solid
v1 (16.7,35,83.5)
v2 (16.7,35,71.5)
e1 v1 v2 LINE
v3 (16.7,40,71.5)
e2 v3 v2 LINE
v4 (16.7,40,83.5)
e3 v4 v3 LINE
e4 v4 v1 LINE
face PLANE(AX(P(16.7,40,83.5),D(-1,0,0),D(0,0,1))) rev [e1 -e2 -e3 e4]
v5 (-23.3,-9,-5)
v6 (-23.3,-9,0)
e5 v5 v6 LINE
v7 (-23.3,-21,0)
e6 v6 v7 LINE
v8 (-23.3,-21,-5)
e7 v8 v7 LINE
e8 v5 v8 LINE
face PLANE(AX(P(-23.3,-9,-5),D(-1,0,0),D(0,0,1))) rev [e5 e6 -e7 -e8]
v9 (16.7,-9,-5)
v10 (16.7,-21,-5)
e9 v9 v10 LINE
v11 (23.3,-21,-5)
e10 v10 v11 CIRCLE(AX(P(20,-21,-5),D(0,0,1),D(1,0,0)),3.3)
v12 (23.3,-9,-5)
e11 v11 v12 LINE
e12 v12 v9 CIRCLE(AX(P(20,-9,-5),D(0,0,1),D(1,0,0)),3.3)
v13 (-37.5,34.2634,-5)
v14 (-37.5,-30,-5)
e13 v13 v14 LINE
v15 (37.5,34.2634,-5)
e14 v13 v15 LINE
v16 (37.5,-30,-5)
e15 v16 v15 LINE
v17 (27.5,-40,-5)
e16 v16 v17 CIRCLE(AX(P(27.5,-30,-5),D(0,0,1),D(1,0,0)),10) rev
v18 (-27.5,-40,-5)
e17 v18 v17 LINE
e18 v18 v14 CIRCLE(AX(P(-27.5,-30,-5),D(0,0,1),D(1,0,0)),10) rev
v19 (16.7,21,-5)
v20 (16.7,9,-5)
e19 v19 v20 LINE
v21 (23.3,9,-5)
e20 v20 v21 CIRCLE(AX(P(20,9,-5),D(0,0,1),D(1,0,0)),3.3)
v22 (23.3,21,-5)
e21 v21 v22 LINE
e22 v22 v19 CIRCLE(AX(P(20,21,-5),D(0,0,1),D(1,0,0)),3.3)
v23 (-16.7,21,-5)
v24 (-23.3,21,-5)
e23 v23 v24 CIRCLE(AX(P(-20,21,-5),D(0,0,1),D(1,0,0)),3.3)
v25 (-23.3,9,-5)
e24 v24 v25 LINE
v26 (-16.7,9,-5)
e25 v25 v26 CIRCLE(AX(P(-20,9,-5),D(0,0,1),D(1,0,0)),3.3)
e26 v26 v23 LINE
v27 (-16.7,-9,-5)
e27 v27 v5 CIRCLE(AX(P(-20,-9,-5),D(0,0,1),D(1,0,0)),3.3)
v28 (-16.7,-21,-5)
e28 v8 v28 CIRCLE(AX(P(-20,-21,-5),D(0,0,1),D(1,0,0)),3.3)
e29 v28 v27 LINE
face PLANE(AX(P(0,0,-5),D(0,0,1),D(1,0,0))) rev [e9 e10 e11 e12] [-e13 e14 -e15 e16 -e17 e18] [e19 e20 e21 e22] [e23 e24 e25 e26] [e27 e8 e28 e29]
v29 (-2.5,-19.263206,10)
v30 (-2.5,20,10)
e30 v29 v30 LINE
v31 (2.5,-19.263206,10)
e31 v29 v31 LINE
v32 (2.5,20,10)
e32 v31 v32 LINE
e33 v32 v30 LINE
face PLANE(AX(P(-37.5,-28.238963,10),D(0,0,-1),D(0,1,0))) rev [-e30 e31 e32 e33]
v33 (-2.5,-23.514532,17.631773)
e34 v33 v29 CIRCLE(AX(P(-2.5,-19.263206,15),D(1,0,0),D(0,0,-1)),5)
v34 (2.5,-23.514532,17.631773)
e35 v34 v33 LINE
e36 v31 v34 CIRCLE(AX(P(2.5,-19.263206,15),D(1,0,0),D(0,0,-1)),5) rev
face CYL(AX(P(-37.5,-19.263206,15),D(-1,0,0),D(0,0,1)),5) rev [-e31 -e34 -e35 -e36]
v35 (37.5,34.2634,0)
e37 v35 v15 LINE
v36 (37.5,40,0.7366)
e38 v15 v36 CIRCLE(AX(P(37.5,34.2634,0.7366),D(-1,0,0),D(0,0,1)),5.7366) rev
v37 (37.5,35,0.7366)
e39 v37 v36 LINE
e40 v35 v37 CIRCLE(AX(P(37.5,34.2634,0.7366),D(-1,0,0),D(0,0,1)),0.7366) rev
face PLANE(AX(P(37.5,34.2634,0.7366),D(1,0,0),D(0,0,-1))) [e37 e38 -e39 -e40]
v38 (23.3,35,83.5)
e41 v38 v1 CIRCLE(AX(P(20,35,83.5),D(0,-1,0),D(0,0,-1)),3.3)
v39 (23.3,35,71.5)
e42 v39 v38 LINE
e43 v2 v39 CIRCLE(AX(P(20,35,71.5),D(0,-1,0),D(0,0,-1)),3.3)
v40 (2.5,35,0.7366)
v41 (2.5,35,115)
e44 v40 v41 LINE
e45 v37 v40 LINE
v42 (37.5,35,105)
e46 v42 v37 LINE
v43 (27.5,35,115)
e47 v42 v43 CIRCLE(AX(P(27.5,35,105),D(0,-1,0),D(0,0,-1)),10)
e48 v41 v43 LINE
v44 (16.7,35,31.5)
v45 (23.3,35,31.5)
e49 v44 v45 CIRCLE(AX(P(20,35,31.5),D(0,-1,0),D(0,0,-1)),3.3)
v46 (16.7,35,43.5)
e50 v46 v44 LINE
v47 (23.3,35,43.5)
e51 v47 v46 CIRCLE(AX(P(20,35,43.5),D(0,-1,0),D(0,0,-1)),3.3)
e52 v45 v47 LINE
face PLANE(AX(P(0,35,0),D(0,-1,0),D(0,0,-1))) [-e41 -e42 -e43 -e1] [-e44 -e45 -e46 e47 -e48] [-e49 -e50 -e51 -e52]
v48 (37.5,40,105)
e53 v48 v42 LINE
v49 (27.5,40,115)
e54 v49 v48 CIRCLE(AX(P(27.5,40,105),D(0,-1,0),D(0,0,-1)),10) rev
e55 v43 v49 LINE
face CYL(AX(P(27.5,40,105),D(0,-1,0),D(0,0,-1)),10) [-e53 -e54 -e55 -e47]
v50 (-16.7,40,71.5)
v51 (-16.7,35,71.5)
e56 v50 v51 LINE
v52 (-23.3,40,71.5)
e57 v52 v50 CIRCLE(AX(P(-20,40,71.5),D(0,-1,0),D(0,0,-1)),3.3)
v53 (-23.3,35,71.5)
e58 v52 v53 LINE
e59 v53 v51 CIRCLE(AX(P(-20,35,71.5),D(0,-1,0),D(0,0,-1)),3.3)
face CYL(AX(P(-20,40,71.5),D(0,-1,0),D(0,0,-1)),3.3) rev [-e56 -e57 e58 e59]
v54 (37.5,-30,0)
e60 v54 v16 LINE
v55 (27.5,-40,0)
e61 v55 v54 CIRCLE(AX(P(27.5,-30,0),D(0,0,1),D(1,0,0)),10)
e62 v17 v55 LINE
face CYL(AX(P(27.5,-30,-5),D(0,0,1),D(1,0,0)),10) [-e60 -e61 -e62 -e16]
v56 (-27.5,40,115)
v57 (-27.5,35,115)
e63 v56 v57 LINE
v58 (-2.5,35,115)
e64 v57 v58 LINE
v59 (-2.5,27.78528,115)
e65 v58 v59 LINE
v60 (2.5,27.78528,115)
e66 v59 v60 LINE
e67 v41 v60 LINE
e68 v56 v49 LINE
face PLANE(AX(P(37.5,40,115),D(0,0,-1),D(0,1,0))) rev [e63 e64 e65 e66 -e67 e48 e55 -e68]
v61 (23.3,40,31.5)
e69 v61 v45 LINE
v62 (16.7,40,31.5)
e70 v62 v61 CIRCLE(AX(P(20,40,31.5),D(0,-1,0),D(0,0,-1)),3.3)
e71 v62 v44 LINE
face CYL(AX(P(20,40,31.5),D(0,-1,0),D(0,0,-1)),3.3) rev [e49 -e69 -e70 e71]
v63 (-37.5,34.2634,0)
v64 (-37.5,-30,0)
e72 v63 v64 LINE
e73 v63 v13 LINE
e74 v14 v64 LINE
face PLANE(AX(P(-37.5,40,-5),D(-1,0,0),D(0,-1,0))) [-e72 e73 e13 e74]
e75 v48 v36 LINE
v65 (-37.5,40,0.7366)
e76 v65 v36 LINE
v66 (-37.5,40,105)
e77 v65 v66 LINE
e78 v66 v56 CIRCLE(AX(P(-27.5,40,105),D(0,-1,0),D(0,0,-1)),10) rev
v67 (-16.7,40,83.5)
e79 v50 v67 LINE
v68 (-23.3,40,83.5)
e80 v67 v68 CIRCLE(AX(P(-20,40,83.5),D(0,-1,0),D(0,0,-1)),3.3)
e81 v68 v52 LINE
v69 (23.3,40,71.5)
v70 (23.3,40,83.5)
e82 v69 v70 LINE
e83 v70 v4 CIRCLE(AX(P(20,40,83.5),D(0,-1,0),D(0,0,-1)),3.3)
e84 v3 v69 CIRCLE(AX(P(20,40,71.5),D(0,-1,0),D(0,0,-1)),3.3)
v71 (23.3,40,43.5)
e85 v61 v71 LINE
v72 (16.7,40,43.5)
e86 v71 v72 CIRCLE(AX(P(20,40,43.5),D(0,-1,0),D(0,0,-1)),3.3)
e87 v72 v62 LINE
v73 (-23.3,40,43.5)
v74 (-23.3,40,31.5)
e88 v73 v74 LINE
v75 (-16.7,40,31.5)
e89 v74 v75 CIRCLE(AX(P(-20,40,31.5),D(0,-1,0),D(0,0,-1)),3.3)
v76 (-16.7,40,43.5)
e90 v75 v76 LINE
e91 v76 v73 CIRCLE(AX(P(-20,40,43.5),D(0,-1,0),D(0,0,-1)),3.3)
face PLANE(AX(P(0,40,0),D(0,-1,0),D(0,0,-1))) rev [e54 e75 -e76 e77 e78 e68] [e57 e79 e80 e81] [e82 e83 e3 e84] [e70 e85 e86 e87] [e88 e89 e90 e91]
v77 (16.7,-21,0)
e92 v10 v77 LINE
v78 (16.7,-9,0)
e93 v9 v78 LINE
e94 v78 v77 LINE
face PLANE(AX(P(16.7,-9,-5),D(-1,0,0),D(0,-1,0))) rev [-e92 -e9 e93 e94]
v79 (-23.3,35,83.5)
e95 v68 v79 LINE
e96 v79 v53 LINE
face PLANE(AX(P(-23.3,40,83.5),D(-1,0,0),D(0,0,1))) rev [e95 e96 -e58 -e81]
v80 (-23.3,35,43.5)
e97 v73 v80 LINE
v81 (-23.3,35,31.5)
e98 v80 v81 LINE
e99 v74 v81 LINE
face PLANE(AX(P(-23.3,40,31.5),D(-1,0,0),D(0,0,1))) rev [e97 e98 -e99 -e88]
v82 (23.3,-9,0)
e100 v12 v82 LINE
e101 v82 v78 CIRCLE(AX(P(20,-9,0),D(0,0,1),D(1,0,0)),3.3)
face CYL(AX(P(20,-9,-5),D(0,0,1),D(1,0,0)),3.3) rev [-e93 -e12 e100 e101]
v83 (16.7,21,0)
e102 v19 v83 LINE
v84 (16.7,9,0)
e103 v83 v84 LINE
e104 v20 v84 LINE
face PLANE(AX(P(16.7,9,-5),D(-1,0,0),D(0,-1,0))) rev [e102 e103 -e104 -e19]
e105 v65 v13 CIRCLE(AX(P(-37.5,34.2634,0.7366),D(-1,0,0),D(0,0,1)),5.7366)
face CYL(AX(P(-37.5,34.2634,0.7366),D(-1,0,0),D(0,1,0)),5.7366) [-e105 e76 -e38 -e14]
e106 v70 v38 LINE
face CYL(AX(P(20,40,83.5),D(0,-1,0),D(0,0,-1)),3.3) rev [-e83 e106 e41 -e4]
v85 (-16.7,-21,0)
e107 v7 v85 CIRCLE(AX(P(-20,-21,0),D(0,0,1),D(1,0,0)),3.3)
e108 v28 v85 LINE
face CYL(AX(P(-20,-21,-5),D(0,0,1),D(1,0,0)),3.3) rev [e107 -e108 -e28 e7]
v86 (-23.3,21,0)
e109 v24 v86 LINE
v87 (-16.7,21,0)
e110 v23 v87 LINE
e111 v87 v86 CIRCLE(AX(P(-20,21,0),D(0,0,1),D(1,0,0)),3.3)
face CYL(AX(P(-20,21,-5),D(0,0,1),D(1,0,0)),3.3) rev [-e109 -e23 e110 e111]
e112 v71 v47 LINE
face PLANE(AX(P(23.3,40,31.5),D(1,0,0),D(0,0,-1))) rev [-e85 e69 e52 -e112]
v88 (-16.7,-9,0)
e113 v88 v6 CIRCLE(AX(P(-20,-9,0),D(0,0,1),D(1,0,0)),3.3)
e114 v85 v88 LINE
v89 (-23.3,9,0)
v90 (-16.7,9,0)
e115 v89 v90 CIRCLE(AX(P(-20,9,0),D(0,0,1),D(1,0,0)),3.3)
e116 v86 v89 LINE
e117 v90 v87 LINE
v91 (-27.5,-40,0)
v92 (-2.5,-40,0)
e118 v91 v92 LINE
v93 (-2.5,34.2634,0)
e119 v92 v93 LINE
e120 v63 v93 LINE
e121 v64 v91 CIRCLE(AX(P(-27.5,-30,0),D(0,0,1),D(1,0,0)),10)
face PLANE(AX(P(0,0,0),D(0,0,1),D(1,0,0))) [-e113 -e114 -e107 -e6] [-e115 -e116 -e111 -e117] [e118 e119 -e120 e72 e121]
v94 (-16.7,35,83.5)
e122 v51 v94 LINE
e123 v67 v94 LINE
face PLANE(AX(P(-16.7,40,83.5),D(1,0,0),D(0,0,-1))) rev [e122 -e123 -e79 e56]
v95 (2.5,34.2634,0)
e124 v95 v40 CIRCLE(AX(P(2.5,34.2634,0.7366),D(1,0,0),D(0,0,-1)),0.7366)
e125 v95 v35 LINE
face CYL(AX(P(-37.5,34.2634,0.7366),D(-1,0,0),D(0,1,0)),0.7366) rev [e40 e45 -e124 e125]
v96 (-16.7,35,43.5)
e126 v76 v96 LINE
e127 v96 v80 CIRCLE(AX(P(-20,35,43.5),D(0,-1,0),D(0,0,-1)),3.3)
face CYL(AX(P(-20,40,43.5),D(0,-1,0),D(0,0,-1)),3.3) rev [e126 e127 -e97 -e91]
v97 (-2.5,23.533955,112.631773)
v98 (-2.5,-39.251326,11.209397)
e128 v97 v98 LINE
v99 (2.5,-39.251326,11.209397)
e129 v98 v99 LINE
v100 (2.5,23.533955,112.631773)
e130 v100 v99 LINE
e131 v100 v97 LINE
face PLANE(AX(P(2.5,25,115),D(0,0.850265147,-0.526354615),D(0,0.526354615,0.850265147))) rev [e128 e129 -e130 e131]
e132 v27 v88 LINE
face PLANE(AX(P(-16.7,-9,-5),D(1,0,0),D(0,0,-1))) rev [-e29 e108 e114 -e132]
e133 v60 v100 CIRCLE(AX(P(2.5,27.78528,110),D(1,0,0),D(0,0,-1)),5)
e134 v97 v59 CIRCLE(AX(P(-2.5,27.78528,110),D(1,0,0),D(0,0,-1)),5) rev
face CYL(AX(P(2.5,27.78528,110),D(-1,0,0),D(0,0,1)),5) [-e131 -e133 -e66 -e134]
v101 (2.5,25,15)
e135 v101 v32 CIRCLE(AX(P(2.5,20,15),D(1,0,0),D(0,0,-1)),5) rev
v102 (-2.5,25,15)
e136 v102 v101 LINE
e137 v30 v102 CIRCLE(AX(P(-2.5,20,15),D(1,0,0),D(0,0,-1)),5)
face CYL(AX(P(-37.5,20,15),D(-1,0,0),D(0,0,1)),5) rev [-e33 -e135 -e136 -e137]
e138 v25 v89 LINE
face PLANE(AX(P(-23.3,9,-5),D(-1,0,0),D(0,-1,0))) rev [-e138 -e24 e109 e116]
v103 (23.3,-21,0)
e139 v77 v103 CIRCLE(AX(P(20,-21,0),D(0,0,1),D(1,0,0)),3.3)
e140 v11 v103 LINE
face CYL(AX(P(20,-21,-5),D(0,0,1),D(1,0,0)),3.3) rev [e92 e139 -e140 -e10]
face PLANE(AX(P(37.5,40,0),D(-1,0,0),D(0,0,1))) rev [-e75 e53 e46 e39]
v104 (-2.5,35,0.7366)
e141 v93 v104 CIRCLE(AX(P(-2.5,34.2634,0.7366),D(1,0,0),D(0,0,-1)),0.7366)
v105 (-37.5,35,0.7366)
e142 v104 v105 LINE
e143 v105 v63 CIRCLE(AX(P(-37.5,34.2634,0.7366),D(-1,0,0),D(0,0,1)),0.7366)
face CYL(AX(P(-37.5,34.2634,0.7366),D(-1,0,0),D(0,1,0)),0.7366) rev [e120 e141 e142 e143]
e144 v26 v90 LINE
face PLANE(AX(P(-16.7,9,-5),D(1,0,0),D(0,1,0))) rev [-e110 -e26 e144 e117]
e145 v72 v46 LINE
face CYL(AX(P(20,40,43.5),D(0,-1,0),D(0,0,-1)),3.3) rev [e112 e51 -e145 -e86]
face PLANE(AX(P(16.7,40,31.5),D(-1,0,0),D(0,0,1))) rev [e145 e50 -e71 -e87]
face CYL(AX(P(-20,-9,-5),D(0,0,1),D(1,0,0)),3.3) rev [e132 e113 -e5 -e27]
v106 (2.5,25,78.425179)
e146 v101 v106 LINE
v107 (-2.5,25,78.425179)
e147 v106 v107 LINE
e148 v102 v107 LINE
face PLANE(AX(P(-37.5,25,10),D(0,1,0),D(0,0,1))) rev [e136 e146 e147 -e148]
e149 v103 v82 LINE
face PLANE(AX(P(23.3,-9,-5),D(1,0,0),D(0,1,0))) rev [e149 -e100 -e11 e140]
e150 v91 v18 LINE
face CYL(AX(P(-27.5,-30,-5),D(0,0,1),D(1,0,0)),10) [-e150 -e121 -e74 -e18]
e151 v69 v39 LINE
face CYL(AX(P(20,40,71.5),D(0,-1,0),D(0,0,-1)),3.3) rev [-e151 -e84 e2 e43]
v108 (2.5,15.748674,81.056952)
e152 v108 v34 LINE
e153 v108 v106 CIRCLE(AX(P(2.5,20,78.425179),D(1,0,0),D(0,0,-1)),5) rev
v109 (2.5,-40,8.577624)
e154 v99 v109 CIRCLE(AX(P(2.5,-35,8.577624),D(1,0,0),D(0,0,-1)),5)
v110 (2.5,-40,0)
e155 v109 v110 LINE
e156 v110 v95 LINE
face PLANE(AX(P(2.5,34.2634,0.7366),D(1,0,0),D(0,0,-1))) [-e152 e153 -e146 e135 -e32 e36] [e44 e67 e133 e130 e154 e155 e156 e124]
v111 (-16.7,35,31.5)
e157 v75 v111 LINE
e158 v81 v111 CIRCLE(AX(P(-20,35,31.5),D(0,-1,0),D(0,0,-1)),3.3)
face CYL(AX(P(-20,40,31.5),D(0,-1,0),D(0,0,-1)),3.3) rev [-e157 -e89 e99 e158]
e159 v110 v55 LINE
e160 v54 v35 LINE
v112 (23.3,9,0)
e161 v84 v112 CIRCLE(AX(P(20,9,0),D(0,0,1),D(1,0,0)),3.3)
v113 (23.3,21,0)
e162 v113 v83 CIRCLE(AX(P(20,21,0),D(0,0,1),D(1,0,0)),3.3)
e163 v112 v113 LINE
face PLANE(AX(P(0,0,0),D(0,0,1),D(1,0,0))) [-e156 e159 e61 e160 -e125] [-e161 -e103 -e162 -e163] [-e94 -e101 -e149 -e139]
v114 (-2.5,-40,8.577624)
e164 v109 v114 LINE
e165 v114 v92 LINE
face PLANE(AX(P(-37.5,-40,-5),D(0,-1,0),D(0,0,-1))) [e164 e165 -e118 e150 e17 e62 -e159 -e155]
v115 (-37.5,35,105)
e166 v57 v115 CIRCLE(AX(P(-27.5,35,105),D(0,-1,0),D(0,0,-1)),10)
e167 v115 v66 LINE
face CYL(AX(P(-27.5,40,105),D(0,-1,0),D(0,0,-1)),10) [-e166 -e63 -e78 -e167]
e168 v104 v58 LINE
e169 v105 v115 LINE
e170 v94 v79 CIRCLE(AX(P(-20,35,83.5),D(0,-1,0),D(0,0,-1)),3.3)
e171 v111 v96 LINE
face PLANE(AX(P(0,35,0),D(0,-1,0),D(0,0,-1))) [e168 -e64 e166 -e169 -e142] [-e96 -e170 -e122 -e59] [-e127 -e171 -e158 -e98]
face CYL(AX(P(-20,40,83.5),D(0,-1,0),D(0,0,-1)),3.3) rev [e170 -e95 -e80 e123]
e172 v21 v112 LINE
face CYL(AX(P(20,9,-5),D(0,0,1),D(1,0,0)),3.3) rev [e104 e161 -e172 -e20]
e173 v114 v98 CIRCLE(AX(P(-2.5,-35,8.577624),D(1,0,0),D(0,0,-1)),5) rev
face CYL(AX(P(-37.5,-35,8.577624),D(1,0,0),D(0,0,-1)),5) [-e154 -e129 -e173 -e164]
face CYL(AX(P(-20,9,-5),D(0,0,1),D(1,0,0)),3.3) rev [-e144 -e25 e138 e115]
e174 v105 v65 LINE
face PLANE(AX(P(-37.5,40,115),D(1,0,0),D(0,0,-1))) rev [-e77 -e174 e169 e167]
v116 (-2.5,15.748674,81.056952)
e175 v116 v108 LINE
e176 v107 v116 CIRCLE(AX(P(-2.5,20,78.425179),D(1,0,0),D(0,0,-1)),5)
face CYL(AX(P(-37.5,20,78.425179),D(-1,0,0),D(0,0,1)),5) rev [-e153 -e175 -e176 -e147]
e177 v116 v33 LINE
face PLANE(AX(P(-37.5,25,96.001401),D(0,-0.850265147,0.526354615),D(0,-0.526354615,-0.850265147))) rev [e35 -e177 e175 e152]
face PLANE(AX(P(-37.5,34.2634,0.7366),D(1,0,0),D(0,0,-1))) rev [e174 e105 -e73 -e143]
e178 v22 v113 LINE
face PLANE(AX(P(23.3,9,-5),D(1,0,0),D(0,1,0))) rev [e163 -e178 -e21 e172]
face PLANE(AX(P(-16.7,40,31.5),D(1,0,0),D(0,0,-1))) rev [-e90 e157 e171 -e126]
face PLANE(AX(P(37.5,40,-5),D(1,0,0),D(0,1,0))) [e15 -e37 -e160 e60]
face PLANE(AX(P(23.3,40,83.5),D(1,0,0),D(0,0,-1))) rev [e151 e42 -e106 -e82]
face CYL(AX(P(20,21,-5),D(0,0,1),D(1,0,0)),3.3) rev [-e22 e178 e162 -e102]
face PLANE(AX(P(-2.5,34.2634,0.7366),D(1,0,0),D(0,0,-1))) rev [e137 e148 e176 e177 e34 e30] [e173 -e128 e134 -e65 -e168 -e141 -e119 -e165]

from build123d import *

# Parameters (mm, degrees)
SKETCH_1_W                       = 75
SKETCH_1_H                       = 80
SM_BASE_FLANGE_1_DEPTH           = 5
SM_EDGE_FLANGE_1_STRIP_W         = 21.4732
SM_EDGE_FLANGE_1_STRIP_H         = 5
SM_EDGE_FLANGE_1_STRIP_CUT_DEPTH = 75
SM_EDGE_FLANGE_1_DEPTH           = 75
EXTRUDE_1_DEPTH                  = 2.5
CUT_EXTRUDE_1_DEPTH              = 129.16005618
FILLET_1_R                       = 5
FILLET_2_R                       = 10
CUT_EXTRUDE_2_DEPTH              = 128.401923062
CUT_EXTRUDE_3_DEPTH              = 143.324453275


# Sheet-metal steps are written as plain solids
with BuildPart() as part:
    # Sketch 1 → 基体-法兰1 (new body)
    with BuildSketch(Plane.XY):
        Rectangle(SKETCH_1_W, SKETCH_1_H)
    extrude(amount=-SM_BASE_FLANGE_1_DEPTH)

    # 边线-法兰1 strip (across the edge) → 边线-法兰1 strip cut (cut)
    with BuildSketch(Plane(origin=(37.5, 40, 0), x_dir=(0, -1, 0), z_dir=(-1, 0, 0))):
        with Locations((-5, -2.5)):
            Rectangle(SM_EDGE_FLANGE_1_STRIP_W, SM_EDGE_FLANGE_1_STRIP_H)
    extrude(amount=SM_EDGE_FLANGE_1_STRIP_CUT_DEPTH, mode=Mode.SUBTRACT)

    # 边线-法兰1 section (across the edge) → 边线-法兰1 (add)
    with BuildSketch(Plane(origin=(37.5, 40, 0), x_dir=(0, -1, 0), z_dir=(-1, 0, 0))):
        with BuildLine():
            Line((0, 0.7366), (0, 115))
            Line((0, 115), (5, 115))
            Line((5, 115), (5, 0.7366))
            ThreePointArc((5, 0.7366), (5.215745145, 0.215745145), (5.7366, 0))
            Line((5.7366, 0), (5.7366, -5))
            ThreePointArc((5.7366, -5), (1.680211239, -3.319788761), (0, 0.7366))
        make_face()
    extrude(amount=SM_EDGE_FLANGE_1_DEPTH)

    # 草图9 → 凸台-拉伸1 (add, symmetric)
    with BuildSketch(Plane(origin=(0, 0, 0), x_dir=(0, 0, -1), z_dir=(1, 0, 0))):
        with BuildLine():
            Line((-115, 35), (-115, 25))
            Line((-115, 25), (-10, -40))
            Line((-10, -40), (0, -40))
            Line((0, -40), (0, 34.2634))
            ThreePointArc((0, 34.2634), (-0.215745145, 34.784254855), (-0.7366, 35))
            Line((-0.7366, 35), (-115, 35))
        make_face()
    extrude(amount=EXTRUDE_1_DEPTH, both=True)

    # 草图10 → 切除-拉伸1 (cut, through all)
    with BuildSketch(Plane(origin=(2.5, 0, 0), x_dir=(0, 0, -1), z_dir=(1, 0, 0))):
        Polygon((-10, 25), (-96.001401484, 25), (-10, -28.238962824), align=None)
    extrude(amount=-CUT_EXTRUDE_1_DEPTH, mode=Mode.SUBTRACT)

    # 圆角1
    fillet_1_edges = [part.edges().sort_by_distance(p)[0] for p in [
        (0, 25, 115),
        (0, -40, 10),
        (0, 25, 10),
        (0, -28.238962824, 10),
        (0, 25, 96.001401484),
    ]]
    fillet(fillet_1_edges, radius=FILLET_1_R)

    # 圆角2
    fillet_2_edges = [part.edges().sort_by_distance(p)[0] for p in [
        (37.5, 37.5, 115),
        (-37.5, 37.5, 115),
        (37.5, -40, -2.5),
        (-37.5, -40, -2.5),
    ]]
    fillet(fillet_2_edges, radius=FILLET_2_R)

    # 草图11 → 切除-拉伸2 (cut, through all)
    with BuildSketch(Plane.XY):
        with BuildLine():
            Line((-16.7, -9), (-16.7, -21))
            ThreePointArc((-16.7, -21), (-20, -24.3), (-23.3, -21))
            Line((-23.3, -21), (-23.3, -9))
            ThreePointArc((-23.3, -9), (-20, -5.7), (-16.7, -9))
        make_face()
        with BuildLine():
            Line((-23.3, 9), (-23.3, 21))
            ThreePointArc((-23.3, 21), (-20, 24.3), (-16.7, 21))
            Line((-16.7, 21), (-16.7, 9))
            ThreePointArc((-16.7, 9), (-20, 5.7), (-23.3, 9))
        make_face()
        with BuildLine():
            Line((16.7, 9), (16.7, 21))
            ThreePointArc((16.7, 21), (20, 24.3), (23.3, 21))
            Line((23.3, 21), (23.3, 9))
            ThreePointArc((23.3, 9), (20, 5.7), (16.7, 9))
        make_face()
        with BuildLine():
            Line((23.3, -9), (23.3, -21))
            ThreePointArc((23.3, -21), (20, -24.3), (16.7, -21))
            Line((16.7, -21), (16.7, -9))
            ThreePointArc((16.7, -9), (20, -5.7), (23.3, -9))
        make_face()
    extrude(amount=-CUT_EXTRUDE_2_DEPTH, mode=Mode.SUBTRACT)

    # 草图12 → 切除-拉伸3 (cut, through all)
    with BuildSketch(Plane.XZ.offset(-35)):
        with BuildLine():
            Line((-16.7, 83.5), (-16.7, 71.5))
            ThreePointArc((-16.7, 71.5), (-20, 68.2), (-23.3, 71.5))
            Line((-23.3, 71.5), (-23.3, 83.5))
            ThreePointArc((-23.3, 83.5), (-20, 86.8), (-16.7, 83.5))
        make_face()
        with BuildLine():
            Line((23.3, 83.5), (23.3, 71.5))
            ThreePointArc((23.3, 71.5), (20, 68.2), (16.7, 71.5))
            Line((16.7, 71.5), (16.7, 83.5))
            ThreePointArc((16.7, 83.5), (20, 86.8), (23.3, 83.5))
        make_face()
        with BuildLine():
            Line((16.7, 31.5), (16.7, 43.5))
            ThreePointArc((16.7, 43.5), (20, 46.8), (23.3, 43.5))
            Line((23.3, 43.5), (23.3, 31.5))
            ThreePointArc((23.3, 31.5), (20, 28.2), (16.7, 31.5))
        make_face()
        with BuildLine():
            Line((-23.3, 31.5), (-23.3, 43.5))
            ThreePointArc((-23.3, 43.5), (-20, 46.8), (-16.7, 43.5))
            Line((-16.7, 43.5), (-16.7, 31.5))
            ThreePointArc((-16.7, 31.5), (-20, 28.2), (-23.3, 31.5))
        make_face()
    extrude(amount=-CUT_EXTRUDE_3_DEPTH, mode=Mode.SUBTRACT)


solid = part.part
